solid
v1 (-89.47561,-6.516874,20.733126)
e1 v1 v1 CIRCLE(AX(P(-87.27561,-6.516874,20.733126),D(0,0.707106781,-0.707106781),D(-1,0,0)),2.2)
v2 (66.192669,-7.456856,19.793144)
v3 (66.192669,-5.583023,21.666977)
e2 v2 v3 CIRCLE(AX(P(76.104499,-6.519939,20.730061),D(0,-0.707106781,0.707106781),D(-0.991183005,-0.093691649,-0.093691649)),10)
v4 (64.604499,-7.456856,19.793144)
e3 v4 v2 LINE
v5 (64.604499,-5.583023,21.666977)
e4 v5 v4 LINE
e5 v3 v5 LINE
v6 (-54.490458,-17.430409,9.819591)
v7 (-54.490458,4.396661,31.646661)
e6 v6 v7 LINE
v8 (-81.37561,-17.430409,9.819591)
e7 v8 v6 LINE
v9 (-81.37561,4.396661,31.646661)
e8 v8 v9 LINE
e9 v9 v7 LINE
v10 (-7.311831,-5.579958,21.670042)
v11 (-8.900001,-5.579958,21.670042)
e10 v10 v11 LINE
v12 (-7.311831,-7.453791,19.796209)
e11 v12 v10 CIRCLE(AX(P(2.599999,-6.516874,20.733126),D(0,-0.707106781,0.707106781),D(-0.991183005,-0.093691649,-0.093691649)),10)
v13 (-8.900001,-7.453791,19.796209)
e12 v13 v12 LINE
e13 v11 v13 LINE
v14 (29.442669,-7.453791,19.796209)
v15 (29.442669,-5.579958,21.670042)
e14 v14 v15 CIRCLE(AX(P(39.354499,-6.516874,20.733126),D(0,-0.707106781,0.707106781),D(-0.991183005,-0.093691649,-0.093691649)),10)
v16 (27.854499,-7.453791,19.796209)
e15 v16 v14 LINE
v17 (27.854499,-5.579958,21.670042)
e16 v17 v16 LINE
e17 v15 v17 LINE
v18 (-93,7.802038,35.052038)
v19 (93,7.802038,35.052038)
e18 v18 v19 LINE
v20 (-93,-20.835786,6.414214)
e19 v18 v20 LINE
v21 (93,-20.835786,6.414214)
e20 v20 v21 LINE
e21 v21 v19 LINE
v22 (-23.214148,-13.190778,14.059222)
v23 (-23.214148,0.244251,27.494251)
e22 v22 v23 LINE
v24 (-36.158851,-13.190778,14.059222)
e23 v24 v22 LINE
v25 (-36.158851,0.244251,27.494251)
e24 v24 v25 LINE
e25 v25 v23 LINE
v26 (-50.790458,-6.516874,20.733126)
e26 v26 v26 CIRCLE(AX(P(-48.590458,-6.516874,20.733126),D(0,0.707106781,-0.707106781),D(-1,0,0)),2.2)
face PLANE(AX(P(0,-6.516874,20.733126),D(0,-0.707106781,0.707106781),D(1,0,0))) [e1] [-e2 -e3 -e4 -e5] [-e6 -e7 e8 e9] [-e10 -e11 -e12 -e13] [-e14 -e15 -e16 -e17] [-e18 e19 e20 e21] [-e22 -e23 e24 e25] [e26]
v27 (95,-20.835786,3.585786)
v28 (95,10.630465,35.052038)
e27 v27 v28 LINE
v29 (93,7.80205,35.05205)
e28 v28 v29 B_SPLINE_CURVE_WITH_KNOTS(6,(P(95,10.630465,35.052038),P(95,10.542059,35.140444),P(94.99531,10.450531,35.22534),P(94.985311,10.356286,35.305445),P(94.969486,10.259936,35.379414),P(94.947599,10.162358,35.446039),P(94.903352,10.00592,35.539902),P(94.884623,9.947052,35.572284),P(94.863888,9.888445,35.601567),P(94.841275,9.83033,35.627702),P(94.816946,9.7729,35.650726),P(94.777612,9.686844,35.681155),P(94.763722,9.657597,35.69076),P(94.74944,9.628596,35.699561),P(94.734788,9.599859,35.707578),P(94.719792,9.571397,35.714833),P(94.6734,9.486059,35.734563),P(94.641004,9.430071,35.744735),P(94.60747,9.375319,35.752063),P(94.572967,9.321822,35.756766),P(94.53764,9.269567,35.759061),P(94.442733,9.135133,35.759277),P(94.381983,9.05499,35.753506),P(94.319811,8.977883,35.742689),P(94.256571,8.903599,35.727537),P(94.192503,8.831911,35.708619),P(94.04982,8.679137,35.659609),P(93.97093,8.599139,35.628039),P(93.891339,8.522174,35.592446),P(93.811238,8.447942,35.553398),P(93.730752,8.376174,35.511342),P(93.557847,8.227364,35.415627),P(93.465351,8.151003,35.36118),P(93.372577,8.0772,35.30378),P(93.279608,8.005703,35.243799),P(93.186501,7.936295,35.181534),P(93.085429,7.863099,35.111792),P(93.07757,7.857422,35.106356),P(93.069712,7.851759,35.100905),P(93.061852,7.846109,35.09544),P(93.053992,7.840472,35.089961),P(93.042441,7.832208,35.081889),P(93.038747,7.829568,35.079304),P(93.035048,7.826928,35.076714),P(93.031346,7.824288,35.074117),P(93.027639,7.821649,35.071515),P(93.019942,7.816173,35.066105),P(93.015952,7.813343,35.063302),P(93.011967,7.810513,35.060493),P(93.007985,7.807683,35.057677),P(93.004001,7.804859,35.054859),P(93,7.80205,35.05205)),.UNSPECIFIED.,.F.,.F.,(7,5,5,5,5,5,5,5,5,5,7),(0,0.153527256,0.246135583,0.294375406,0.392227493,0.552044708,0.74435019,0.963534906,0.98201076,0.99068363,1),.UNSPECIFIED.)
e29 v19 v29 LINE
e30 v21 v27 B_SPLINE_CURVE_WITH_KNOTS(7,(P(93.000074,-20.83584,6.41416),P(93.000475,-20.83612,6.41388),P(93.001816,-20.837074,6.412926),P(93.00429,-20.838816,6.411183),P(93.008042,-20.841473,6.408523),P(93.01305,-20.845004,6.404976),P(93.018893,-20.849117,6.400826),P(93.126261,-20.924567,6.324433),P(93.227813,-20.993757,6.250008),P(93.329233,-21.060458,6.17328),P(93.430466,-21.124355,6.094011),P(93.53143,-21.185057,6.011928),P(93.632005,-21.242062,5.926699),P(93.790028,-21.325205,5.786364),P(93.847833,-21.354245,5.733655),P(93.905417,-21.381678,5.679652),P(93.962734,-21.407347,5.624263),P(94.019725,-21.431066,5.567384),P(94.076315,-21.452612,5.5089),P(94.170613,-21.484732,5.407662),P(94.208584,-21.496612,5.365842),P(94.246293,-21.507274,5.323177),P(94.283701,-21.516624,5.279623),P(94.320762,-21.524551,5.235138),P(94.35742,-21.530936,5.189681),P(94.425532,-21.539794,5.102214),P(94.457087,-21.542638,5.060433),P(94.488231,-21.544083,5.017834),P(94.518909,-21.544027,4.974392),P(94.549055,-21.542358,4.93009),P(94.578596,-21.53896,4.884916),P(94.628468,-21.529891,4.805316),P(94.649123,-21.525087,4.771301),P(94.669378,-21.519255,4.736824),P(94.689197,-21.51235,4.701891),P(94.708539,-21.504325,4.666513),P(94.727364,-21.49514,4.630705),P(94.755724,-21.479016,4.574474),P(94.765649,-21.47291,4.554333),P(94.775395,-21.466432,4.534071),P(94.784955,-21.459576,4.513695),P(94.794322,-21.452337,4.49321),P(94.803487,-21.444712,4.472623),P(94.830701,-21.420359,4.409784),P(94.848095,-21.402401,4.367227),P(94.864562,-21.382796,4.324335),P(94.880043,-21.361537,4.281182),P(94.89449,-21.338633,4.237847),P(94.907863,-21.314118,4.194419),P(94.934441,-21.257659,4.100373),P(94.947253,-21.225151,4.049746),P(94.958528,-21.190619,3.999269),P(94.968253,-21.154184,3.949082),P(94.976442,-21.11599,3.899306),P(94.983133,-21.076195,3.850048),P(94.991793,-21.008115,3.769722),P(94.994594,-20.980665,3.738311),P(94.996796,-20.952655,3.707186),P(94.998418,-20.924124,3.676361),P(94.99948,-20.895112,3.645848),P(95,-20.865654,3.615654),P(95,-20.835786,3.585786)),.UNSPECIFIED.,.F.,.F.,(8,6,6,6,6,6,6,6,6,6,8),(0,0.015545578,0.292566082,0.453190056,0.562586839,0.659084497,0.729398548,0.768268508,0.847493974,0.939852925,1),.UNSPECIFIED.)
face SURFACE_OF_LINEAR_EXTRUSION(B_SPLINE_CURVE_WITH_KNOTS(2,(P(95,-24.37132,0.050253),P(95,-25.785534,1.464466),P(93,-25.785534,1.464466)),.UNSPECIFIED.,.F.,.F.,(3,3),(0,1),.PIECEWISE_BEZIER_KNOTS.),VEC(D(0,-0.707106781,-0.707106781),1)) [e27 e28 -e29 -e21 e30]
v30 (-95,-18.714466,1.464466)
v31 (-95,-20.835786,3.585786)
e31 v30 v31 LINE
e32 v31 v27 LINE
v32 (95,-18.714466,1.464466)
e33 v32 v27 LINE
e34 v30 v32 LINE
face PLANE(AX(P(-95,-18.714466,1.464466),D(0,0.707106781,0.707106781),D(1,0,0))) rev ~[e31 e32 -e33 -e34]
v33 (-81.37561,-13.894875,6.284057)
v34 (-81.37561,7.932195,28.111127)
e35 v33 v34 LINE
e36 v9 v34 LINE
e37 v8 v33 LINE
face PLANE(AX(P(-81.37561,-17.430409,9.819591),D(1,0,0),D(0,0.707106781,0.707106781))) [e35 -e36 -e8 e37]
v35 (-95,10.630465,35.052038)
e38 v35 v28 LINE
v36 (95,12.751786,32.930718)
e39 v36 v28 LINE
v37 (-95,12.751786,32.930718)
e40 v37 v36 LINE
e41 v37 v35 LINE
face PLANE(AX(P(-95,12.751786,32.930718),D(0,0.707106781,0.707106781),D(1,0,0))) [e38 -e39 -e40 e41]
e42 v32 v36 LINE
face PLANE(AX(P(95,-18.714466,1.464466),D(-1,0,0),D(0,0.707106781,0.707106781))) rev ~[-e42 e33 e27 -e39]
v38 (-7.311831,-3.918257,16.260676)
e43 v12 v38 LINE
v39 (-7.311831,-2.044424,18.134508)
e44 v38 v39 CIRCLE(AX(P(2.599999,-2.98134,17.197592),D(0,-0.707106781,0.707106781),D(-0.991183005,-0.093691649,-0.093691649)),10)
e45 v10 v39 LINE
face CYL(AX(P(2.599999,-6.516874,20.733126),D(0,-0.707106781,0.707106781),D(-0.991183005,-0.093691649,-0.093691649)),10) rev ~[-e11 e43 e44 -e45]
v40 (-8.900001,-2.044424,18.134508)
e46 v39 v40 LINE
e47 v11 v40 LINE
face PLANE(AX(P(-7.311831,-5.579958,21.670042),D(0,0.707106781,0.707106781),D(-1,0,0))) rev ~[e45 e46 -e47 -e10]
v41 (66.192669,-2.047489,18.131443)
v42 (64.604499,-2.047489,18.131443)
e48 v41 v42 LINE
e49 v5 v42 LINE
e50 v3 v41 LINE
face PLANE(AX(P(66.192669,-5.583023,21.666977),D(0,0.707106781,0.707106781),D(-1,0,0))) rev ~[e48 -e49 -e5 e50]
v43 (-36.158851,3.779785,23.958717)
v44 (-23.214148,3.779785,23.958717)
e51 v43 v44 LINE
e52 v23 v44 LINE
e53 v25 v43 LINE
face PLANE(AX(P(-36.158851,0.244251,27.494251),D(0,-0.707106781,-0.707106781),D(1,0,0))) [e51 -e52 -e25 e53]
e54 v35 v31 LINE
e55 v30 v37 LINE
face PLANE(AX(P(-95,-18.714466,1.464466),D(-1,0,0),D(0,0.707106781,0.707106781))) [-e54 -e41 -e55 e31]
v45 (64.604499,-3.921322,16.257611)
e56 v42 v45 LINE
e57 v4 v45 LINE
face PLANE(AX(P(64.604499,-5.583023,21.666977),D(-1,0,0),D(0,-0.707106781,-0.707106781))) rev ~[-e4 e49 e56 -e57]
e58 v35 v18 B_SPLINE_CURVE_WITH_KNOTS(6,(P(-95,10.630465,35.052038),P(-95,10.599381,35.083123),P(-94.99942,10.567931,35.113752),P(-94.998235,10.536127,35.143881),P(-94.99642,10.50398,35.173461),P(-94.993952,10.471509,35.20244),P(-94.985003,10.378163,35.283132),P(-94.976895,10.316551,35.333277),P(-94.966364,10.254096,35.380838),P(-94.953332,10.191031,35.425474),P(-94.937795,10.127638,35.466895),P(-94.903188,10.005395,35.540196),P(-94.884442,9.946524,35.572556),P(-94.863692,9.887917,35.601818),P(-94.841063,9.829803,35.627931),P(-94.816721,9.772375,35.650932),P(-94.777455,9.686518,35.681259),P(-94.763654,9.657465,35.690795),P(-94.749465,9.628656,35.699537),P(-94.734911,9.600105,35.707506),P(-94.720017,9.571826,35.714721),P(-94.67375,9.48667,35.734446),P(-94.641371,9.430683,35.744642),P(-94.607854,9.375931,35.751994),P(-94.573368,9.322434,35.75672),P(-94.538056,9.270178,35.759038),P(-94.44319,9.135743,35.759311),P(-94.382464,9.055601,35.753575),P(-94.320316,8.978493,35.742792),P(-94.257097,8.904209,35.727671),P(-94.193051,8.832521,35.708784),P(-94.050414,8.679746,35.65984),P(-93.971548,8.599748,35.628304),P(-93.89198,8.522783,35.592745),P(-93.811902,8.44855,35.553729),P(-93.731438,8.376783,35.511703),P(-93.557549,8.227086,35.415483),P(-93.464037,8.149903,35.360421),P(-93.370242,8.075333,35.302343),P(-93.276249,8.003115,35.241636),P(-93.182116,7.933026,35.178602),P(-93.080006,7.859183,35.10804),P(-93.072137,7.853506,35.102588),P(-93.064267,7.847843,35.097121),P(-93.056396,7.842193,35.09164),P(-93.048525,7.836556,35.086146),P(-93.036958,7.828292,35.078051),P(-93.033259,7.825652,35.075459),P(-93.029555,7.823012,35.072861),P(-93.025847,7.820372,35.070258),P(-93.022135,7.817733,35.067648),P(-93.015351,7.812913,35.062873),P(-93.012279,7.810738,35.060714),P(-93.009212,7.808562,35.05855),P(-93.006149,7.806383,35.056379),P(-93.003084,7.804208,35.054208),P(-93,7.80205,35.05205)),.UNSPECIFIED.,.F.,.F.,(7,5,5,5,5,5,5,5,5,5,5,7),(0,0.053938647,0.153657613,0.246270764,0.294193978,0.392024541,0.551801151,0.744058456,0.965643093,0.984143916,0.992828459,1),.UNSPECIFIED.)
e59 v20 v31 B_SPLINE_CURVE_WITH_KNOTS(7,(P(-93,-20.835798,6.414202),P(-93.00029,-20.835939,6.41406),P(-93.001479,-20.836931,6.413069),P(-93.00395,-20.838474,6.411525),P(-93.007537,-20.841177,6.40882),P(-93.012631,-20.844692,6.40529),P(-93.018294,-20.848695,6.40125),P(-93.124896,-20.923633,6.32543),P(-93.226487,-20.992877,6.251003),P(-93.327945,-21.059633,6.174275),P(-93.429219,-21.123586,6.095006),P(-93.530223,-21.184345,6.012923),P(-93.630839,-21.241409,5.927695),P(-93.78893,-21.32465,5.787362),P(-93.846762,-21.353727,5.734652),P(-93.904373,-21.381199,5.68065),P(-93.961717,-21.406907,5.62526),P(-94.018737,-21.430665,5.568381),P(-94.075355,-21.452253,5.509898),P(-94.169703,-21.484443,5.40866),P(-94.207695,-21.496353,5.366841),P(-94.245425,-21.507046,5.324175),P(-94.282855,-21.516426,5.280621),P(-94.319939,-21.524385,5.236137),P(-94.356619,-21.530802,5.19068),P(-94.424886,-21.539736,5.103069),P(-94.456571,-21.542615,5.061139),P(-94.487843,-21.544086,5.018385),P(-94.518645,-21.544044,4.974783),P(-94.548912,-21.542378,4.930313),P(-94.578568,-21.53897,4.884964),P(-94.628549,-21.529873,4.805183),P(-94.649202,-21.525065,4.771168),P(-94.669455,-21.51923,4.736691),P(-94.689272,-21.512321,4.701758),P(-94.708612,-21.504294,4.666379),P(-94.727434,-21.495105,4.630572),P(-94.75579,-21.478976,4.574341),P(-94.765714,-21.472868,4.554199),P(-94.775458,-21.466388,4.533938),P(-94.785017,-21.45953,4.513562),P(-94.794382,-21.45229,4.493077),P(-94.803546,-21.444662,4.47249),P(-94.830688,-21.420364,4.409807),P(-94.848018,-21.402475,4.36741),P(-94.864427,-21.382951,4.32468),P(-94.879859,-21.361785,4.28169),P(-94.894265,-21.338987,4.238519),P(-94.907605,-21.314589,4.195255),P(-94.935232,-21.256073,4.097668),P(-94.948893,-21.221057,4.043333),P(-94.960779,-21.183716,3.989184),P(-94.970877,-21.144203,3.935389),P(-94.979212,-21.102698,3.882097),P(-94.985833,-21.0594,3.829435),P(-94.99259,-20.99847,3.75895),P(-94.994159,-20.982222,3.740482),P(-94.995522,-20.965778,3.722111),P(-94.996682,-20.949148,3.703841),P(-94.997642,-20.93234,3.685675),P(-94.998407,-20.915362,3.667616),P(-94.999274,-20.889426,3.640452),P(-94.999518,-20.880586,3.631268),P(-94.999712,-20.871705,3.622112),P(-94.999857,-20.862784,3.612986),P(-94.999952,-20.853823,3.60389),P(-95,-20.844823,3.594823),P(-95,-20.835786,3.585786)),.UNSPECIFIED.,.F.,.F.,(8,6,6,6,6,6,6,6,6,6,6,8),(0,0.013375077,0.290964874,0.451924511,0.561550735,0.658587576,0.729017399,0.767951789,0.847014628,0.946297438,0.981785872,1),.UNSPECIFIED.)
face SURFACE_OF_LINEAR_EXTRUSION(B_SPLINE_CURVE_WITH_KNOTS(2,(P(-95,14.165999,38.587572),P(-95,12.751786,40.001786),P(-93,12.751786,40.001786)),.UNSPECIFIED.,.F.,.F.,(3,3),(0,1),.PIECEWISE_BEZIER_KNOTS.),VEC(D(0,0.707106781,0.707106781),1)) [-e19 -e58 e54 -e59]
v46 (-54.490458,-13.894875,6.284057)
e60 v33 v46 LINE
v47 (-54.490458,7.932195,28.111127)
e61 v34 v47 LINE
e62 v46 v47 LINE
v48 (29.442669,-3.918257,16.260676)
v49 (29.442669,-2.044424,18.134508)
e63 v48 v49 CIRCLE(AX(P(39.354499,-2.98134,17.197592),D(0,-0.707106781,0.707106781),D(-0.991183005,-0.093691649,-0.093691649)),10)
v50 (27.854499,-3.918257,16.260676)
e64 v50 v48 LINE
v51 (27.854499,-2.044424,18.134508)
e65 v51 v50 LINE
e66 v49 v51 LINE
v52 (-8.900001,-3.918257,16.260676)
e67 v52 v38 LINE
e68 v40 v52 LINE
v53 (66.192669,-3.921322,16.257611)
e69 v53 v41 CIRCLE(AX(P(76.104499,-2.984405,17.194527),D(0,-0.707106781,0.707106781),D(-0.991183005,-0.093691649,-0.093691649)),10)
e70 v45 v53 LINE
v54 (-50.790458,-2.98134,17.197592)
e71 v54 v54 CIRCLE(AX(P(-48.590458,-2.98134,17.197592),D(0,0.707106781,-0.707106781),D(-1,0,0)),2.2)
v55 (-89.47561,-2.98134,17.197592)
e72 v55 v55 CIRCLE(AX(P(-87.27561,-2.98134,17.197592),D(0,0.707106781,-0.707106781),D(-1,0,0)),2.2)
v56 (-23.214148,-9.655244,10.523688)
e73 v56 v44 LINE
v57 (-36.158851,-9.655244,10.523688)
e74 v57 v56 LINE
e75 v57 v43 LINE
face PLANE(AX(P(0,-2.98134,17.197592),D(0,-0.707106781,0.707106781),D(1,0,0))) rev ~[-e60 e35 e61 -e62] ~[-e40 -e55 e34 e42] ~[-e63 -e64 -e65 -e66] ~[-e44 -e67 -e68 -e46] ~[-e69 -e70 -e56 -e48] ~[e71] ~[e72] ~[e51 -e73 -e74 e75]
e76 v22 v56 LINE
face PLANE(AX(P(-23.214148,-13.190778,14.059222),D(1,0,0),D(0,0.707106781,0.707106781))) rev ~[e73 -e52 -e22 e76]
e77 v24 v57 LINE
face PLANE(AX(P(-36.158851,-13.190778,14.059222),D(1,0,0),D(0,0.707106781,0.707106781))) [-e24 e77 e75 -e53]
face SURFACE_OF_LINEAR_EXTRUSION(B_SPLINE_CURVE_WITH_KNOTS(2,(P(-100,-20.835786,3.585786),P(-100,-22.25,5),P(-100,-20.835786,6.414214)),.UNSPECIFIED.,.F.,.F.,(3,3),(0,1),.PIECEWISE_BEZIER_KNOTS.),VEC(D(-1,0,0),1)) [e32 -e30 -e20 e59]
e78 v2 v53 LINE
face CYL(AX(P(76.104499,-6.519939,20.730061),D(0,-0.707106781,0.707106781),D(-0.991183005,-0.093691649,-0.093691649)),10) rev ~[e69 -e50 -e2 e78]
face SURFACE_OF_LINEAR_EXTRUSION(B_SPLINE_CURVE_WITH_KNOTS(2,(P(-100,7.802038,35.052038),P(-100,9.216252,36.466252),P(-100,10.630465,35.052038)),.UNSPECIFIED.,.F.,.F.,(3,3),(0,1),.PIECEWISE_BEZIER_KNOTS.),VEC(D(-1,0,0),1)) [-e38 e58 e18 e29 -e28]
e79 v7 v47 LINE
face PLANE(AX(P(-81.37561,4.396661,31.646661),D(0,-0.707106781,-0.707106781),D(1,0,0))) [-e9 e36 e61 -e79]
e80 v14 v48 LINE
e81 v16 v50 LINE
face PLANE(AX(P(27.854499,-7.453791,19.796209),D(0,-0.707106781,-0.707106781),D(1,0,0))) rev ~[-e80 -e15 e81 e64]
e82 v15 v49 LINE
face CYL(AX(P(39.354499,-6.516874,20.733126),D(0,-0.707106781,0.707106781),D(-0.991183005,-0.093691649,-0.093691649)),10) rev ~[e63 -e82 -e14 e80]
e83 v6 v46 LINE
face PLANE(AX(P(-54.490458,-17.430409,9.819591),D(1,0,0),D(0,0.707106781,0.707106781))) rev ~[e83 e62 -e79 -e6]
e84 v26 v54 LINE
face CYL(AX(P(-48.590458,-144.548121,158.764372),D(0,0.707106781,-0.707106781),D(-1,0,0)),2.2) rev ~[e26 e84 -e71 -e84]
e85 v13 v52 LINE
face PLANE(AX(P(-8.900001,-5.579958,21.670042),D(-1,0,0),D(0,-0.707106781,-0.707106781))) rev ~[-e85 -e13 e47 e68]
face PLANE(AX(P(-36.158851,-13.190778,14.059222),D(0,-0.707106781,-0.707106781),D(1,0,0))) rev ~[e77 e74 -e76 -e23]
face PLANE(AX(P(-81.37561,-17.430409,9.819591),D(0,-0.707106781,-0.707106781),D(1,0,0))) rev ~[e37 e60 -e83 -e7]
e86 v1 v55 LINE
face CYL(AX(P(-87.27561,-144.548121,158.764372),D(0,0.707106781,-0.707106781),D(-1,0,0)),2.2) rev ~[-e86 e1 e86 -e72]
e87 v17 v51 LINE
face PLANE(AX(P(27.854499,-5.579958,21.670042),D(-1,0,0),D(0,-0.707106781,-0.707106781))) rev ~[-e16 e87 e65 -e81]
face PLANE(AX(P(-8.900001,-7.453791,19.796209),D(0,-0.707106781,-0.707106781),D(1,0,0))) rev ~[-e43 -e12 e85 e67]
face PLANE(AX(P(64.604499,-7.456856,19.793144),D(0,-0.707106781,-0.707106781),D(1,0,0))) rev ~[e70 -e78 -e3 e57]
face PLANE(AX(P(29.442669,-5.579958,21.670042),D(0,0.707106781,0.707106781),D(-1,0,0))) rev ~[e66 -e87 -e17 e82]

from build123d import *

# Parameters (mm, degrees)
F0_W        = 190
F0_H        = 44.5
F1_DEPTH    = 5
F2_W        = 26.885152871
F2_H        = 30.8681384815
F2_W_2      = 12.9447032342
F2_H_2      = 19
F3_DEPTH    = 5.001
F4_D        = 4.4
F5_ANGLE    = -45
F6_T1_DEPTH = 54.5
F6_T3_DEPTH = 200
F6_T5_DEPTH = 54.5


# Not quite as in the source:
# - a fillet or chamfer that OpenCascade refuses, or shapes differently, is made with other operations: its cross-section is extruded or revolved along the edge and cut away or added


with BuildPart() as f1:
    # F0 (on Top) → F1 (new body)
    with BuildSketch(Plane.XY):
        Rectangle(F0_W, F0_H)
    extrude(amount=F1_DEPTH)

    # F2 (on face) → F3 (cut, through all)
    with BuildSketch(Plane.XY.offset(5)):
        with Locations((-67.9330339405, 0)):
            Rectangle(F2_W, F2_H)
        with Locations((-29.686499387, 0.061675)):
            Rectangle(F2_W_2, F2_H_2)
        with BuildLine():
            Line((-8.9000007138, -1.3249999611), (-7.3118307668, -1.3249999611))
            ThreePointArc((-7.3118307668, -1.3249999611), (12.5999992862, 3.89e-08), (-7.3118307668, 1.3250000389))
            Line((-7.3118307668, 1.3250000389), (-8.9000007138, 1.3250000389))
            Line((-8.9000007138, 1.3250000389), (-8.9000007138, -1.3249999611))
        make_face()
        with BuildLine():
            Line((27.8544989455, -1.3249999611), (29.4426688924, -1.3249999611))
            ThreePointArc((29.4426688924, -1.3249999611), (49.3544989455, 3.89e-08), (29.4426688924, 1.3250000389))
            Line((29.4426688924, 1.3250000389), (27.8544989455, 1.3250000389))
            Line((27.8544989455, 1.3250000389), (27.8544989455, -1.3249999611))
        make_face()
        with BuildLine():
            Line((64.6044989455, -1.3293345302), (66.1926688924, -1.3293345302))
            ThreePointArc((66.1926688924, -1.3293345302), (86.1044989455, -0.0043345302), (66.1926688924, 1.3206654698))
            Line((66.1926688924, 1.3206654698), (64.6044989455, 1.3206654698))
            Line((64.6044989455, 1.3206654698), (64.6044989455, -1.3293345302))
        make_face()
    extrude(amount=-F3_DEPTH, mode=Mode.SUBTRACT)

    # F4 (through all)
    with Locations(Plane.XY.offset(5)):
        with Locations((-87.275610376, 0), (-48.590457505, 0)):
            Hole(F4_D / 2)


with BuildPart() as f1_1:
    # F5: moved
    add(f1.part.rotate(Axis((0, -22.25, 5), (-1, 0, 0)), F5_ANGLE))

    # F6: fillet of radius 2 on 4 edges, made by hand

    # F6_s2 → F6_t1 (cut)
    with BuildSketch(Plane(origin=(0, 26.3767856687, 26.3767856687), x_dir=(1, 0, 0), z_dir=(0, -0.7071067812, -0.7071067812))):
        with BuildLine():
            add(Edge.make_bspline(
                [(-95, 17.2686597873), (-95, 19.2686597873), (-93, 19.2686597873)],
                knots=[0, 0, 0, 1, 1, 1], degree=2, weights=[1, 1, 1]))
            Line((-93, 19.2686597873), (-95, 19.2686597873))
            Line((-95, 19.2686597873), (-95, 17.2686597873))
        make_face()
    extrude(amount=F6_T1_DEPTH, mode=Mode.SUBTRACT)

    # F6_s4 → F6_t3 (cut)
    with BuildSketch(Plane.YZ.offset(-100)):
        with BuildLine():
            add(Edge.make_bspline(
                [(7.8020382004, 35.0520382004), (9.2162517628, 36.4662517628), (10.6304653252, 35.0520382004)],
                knots=[0, 0, 0, 1, 1, 1], degree=2, weights=[1, 1, 1]))
            Line((10.6304653252, 35.0520382004), (9.2162517628, 36.4662517628))
            Line((9.2162517628, 36.4662517628), (7.8020382004, 35.0520382004))
        make_face()
        with BuildLine():
            add(Edge.make_bspline(
                [(-20.8357864376, 3.5857864376), (-22.25, 5), (-20.8357864376, 6.4142135624)],
                knots=[0, 0, 0, 1, 1, 1], degree=2, weights=[1, 1, 1]))
            Line((-20.8357864376, 6.4142135624), (-22.25, 5))
            Line((-22.25, 5), (-20.8357864376, 3.5857864376))
        make_face()
    extrude(amount=F6_T3_DEPTH, mode=Mode.SUBTRACT)

    # F6_s6 → F6_t5 (cut)
    with BuildSketch(Plane(origin=(0, -12.1605339059, -12.1605339059), x_dir=(1, 0, 0), z_dir=(0, 0.7071067812, 0.7071067812))):
        with BuildLine():
            add(Edge.make_bspline(
                [(95, -17.2686597873), (95, -19.2686597873), (93, -19.2686597873)],
                knots=[0, 0, 0, 1, 1, 1], degree=2, weights=[1, 1, 1]))
            Line((93, -19.2686597873), (95, -19.2686597873))
            Line((95, -19.2686597873), (95, -17.2686597873))
        make_face()
    extrude(amount=F6_T5_DEPTH, mode=Mode.SUBTRACT)


solid = f1_1.part
